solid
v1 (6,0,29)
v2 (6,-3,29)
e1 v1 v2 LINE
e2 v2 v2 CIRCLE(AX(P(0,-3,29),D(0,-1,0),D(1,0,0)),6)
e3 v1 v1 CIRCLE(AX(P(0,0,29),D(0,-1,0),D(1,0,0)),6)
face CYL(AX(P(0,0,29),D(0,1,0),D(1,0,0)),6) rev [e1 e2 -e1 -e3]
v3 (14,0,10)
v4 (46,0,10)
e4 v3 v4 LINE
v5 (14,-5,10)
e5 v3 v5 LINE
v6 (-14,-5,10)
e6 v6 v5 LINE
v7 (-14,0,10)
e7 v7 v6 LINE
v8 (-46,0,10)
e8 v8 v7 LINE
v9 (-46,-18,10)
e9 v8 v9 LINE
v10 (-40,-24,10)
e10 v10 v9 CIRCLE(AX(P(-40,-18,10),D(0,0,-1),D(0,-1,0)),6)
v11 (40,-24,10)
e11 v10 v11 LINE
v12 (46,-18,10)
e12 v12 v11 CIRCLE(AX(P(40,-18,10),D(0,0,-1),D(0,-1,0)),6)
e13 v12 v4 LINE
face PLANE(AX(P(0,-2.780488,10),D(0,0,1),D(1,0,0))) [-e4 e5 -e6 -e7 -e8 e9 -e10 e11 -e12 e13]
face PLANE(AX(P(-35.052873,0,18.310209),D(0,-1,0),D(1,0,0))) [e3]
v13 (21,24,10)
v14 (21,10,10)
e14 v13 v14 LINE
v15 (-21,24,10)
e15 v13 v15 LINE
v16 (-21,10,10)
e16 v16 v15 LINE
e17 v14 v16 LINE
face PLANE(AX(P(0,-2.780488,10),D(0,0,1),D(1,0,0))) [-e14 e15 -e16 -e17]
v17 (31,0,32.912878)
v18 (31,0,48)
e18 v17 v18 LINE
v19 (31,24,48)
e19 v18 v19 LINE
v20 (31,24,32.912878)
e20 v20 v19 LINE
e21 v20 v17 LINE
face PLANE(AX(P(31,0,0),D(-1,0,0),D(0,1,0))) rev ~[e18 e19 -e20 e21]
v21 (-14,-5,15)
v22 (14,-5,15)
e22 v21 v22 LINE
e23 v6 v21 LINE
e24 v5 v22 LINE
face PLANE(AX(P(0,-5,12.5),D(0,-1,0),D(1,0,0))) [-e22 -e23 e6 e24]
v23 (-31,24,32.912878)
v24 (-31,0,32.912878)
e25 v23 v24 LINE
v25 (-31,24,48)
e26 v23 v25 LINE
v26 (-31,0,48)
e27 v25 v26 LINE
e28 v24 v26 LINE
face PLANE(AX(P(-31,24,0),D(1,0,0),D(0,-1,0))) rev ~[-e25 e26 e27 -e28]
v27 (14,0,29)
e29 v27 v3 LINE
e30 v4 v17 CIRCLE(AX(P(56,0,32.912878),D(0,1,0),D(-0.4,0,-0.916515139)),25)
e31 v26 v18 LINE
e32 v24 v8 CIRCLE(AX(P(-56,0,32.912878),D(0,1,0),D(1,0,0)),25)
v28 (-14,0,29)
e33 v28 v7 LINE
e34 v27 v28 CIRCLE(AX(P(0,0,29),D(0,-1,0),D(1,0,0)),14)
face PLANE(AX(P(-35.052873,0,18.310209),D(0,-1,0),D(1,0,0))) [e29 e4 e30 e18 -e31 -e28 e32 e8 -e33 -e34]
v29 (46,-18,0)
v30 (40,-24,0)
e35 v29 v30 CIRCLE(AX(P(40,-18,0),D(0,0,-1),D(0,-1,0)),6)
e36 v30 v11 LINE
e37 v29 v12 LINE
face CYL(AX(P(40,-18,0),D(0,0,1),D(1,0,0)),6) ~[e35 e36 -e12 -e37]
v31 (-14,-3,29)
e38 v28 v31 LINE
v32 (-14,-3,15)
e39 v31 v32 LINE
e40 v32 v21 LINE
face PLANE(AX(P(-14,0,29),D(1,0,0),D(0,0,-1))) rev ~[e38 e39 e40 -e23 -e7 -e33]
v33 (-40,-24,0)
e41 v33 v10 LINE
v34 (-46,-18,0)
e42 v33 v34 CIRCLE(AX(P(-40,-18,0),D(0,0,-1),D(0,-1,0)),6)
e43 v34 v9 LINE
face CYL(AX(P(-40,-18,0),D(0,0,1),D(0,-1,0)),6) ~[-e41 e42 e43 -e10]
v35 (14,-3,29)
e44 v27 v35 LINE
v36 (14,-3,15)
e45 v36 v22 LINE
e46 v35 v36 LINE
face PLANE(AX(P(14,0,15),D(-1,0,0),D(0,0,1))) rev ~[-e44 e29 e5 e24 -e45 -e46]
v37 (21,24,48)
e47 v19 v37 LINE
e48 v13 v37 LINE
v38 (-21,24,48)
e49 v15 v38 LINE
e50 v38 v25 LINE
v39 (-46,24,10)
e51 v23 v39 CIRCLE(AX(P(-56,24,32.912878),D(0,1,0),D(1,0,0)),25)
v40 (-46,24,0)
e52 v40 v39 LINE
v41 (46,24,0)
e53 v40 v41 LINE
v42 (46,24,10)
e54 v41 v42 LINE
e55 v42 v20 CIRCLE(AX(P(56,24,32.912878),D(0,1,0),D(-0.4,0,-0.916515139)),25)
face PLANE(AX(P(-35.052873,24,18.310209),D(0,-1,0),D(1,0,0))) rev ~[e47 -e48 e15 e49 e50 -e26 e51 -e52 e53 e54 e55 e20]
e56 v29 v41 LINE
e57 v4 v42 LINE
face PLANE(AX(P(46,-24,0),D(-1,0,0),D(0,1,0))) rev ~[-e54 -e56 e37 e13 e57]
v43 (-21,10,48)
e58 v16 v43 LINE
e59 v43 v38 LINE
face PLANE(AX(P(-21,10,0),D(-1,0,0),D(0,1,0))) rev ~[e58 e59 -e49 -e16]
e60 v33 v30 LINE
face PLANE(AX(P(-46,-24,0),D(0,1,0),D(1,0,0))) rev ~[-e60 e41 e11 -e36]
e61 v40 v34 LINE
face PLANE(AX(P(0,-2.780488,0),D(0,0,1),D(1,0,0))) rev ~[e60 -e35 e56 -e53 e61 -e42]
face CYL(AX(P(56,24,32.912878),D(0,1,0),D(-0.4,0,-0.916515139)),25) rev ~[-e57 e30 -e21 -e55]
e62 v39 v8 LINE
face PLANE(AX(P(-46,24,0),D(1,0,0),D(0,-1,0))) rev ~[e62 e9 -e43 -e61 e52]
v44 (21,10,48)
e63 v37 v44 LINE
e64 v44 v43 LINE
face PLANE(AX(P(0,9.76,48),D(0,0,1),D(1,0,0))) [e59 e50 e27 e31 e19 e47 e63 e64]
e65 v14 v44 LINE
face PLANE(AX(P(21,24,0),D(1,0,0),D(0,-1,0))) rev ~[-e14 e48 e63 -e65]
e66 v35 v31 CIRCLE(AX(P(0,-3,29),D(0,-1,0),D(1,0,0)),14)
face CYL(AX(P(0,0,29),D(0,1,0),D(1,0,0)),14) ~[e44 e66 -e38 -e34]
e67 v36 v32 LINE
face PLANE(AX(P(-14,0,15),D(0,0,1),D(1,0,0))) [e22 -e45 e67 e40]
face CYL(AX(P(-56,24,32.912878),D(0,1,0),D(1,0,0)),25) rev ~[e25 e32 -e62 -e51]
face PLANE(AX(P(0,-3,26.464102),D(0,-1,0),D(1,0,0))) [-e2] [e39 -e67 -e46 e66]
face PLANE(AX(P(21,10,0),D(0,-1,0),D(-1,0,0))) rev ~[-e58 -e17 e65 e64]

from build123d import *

# Parameters (mm, degrees)
F1_DEPTH    = 48
F0_W        = 42
F0_H        = 14
F2_DEPTH    = 10
F3_T1_DEPTH = 24
F4_T1_DEPTH = 24
F5_R        = 6
F6_DEPTH    = 3
F5_W        = 28
F5_H        = 5
F7_DEPTH    = 3
F8_R        = 6
F9_R        = 6
F10_W       = 28
F10_H       = 5
F11_DEPTH   = 5


# Not quite as in the source:
# - a fillet or chamfer that OpenCascade refuses, or shapes differently, is made with other operations: its cross-section is extruded or revolved along the edge and cut away or added


with BuildPart() as f1:
    # F0 (on Top) → F1 (new body)
    with BuildSketch(Plane.XY):
        Polygon((31, 0), (31, 24), (21, 24), (21, 10), (-21, 10), (-21, 24), (-31, 24), (-31, 0), align=None)
    extrude(amount=F1_DEPTH)

    # F0 (on Top) → F2 (join)
    with BuildSketch(Plane.XY):
        Polygon((-46, -24), (46, -24), (46, 24), (31, 24), (31, 0), (-31, 0), (-31, 24), (-46, 24), align=None)
        Polygon((31, 0), (31, 24), (21, 24), (21, 10), (-21, 10), (-21, 24), (-31, 24), (-31, 0), align=None)
        with Locations((0, 17)):
            Rectangle(F0_W, F0_H)
    extrude(amount=F2_DEPTH)

    # F3: fillet of radius 25 on 1 edges, made by hand

    # F3_s2 → F3_t1 (join)
    with BuildSketch(Plane.XZ.offset(-24)):
        with BuildLine():
            ThreePointArc((46, 10), (35.0834993366, 19.2198145372), (31, 32.9128784748))
            Line((31, 32.9128784748), (31, 10))
            Line((31, 10), (46, 10))
        make_face()
    extrude(amount=F3_T1_DEPTH)

    # F4: fillet of radius 25 on 1 edges, made by hand

    # F4_s2 → F4_t1 (join)
    with BuildSketch(Plane.XZ.offset(-24)):
        with BuildLine():
            ThreePointArc((-31, 32.9128784748), (-35.0834993366, 19.2198145372), (-46, 10))
            Line((-46, 10), (-31, 10))
            Line((-31, 10), (-31, 32.9128784748))
        make_face()
    extrude(amount=F4_T1_DEPTH)

    # F5 (on face) → F6 (join)
    with BuildSketch(Plane.XZ):
        with BuildLine():
            Line((14, 15), (14, 29))
            ThreePointArc((14, 29), (0, 43), (-14, 29))
            Line((-14, 29), (-14, 15))
            Line((-14, 15), (14, 15))
        make_face()
        with Locations((0, 29)):
            Circle(F5_R, mode=Mode.SUBTRACT)
    extrude(amount=F6_DEPTH)

    # F5 (on face) → F7 (join)
    with BuildSketch(Plane.XZ):
        with BuildLine():
            Line((14, 15), (14, 29))
            ThreePointArc((14, 29), (0, 43), (-14, 29))
            Line((-14, 29), (-14, 15))
            Line((-14, 15), (14, 15))
        make_face()
        with Locations((0, 29)):
            Circle(F5_R, mode=Mode.SUBTRACT)
        with Locations((0, 12.5)):
            Rectangle(F5_W, F5_H)
    extrude(amount=F7_DEPTH)

    # F8
    f8_edges = [f1.edges().sort_by_distance(p)[0] for p in [
        (46, -24, 5),
    ]]
    fillet(f8_edges, radius=F8_R)

    # F9
    f9_edges = [f1.edges().sort_by_distance(p)[0] for p in [
        (-46, -24, 5),
    ]]
    fillet(f9_edges, radius=F9_R)

    # F10 (on face) → F11 (join)
    with BuildSketch(Plane.XZ):
        with Locations((0, 12.5)):
            Rectangle(F10_W, F10_H)
    extrude(amount=F11_DEPTH)


solid = f1.part
